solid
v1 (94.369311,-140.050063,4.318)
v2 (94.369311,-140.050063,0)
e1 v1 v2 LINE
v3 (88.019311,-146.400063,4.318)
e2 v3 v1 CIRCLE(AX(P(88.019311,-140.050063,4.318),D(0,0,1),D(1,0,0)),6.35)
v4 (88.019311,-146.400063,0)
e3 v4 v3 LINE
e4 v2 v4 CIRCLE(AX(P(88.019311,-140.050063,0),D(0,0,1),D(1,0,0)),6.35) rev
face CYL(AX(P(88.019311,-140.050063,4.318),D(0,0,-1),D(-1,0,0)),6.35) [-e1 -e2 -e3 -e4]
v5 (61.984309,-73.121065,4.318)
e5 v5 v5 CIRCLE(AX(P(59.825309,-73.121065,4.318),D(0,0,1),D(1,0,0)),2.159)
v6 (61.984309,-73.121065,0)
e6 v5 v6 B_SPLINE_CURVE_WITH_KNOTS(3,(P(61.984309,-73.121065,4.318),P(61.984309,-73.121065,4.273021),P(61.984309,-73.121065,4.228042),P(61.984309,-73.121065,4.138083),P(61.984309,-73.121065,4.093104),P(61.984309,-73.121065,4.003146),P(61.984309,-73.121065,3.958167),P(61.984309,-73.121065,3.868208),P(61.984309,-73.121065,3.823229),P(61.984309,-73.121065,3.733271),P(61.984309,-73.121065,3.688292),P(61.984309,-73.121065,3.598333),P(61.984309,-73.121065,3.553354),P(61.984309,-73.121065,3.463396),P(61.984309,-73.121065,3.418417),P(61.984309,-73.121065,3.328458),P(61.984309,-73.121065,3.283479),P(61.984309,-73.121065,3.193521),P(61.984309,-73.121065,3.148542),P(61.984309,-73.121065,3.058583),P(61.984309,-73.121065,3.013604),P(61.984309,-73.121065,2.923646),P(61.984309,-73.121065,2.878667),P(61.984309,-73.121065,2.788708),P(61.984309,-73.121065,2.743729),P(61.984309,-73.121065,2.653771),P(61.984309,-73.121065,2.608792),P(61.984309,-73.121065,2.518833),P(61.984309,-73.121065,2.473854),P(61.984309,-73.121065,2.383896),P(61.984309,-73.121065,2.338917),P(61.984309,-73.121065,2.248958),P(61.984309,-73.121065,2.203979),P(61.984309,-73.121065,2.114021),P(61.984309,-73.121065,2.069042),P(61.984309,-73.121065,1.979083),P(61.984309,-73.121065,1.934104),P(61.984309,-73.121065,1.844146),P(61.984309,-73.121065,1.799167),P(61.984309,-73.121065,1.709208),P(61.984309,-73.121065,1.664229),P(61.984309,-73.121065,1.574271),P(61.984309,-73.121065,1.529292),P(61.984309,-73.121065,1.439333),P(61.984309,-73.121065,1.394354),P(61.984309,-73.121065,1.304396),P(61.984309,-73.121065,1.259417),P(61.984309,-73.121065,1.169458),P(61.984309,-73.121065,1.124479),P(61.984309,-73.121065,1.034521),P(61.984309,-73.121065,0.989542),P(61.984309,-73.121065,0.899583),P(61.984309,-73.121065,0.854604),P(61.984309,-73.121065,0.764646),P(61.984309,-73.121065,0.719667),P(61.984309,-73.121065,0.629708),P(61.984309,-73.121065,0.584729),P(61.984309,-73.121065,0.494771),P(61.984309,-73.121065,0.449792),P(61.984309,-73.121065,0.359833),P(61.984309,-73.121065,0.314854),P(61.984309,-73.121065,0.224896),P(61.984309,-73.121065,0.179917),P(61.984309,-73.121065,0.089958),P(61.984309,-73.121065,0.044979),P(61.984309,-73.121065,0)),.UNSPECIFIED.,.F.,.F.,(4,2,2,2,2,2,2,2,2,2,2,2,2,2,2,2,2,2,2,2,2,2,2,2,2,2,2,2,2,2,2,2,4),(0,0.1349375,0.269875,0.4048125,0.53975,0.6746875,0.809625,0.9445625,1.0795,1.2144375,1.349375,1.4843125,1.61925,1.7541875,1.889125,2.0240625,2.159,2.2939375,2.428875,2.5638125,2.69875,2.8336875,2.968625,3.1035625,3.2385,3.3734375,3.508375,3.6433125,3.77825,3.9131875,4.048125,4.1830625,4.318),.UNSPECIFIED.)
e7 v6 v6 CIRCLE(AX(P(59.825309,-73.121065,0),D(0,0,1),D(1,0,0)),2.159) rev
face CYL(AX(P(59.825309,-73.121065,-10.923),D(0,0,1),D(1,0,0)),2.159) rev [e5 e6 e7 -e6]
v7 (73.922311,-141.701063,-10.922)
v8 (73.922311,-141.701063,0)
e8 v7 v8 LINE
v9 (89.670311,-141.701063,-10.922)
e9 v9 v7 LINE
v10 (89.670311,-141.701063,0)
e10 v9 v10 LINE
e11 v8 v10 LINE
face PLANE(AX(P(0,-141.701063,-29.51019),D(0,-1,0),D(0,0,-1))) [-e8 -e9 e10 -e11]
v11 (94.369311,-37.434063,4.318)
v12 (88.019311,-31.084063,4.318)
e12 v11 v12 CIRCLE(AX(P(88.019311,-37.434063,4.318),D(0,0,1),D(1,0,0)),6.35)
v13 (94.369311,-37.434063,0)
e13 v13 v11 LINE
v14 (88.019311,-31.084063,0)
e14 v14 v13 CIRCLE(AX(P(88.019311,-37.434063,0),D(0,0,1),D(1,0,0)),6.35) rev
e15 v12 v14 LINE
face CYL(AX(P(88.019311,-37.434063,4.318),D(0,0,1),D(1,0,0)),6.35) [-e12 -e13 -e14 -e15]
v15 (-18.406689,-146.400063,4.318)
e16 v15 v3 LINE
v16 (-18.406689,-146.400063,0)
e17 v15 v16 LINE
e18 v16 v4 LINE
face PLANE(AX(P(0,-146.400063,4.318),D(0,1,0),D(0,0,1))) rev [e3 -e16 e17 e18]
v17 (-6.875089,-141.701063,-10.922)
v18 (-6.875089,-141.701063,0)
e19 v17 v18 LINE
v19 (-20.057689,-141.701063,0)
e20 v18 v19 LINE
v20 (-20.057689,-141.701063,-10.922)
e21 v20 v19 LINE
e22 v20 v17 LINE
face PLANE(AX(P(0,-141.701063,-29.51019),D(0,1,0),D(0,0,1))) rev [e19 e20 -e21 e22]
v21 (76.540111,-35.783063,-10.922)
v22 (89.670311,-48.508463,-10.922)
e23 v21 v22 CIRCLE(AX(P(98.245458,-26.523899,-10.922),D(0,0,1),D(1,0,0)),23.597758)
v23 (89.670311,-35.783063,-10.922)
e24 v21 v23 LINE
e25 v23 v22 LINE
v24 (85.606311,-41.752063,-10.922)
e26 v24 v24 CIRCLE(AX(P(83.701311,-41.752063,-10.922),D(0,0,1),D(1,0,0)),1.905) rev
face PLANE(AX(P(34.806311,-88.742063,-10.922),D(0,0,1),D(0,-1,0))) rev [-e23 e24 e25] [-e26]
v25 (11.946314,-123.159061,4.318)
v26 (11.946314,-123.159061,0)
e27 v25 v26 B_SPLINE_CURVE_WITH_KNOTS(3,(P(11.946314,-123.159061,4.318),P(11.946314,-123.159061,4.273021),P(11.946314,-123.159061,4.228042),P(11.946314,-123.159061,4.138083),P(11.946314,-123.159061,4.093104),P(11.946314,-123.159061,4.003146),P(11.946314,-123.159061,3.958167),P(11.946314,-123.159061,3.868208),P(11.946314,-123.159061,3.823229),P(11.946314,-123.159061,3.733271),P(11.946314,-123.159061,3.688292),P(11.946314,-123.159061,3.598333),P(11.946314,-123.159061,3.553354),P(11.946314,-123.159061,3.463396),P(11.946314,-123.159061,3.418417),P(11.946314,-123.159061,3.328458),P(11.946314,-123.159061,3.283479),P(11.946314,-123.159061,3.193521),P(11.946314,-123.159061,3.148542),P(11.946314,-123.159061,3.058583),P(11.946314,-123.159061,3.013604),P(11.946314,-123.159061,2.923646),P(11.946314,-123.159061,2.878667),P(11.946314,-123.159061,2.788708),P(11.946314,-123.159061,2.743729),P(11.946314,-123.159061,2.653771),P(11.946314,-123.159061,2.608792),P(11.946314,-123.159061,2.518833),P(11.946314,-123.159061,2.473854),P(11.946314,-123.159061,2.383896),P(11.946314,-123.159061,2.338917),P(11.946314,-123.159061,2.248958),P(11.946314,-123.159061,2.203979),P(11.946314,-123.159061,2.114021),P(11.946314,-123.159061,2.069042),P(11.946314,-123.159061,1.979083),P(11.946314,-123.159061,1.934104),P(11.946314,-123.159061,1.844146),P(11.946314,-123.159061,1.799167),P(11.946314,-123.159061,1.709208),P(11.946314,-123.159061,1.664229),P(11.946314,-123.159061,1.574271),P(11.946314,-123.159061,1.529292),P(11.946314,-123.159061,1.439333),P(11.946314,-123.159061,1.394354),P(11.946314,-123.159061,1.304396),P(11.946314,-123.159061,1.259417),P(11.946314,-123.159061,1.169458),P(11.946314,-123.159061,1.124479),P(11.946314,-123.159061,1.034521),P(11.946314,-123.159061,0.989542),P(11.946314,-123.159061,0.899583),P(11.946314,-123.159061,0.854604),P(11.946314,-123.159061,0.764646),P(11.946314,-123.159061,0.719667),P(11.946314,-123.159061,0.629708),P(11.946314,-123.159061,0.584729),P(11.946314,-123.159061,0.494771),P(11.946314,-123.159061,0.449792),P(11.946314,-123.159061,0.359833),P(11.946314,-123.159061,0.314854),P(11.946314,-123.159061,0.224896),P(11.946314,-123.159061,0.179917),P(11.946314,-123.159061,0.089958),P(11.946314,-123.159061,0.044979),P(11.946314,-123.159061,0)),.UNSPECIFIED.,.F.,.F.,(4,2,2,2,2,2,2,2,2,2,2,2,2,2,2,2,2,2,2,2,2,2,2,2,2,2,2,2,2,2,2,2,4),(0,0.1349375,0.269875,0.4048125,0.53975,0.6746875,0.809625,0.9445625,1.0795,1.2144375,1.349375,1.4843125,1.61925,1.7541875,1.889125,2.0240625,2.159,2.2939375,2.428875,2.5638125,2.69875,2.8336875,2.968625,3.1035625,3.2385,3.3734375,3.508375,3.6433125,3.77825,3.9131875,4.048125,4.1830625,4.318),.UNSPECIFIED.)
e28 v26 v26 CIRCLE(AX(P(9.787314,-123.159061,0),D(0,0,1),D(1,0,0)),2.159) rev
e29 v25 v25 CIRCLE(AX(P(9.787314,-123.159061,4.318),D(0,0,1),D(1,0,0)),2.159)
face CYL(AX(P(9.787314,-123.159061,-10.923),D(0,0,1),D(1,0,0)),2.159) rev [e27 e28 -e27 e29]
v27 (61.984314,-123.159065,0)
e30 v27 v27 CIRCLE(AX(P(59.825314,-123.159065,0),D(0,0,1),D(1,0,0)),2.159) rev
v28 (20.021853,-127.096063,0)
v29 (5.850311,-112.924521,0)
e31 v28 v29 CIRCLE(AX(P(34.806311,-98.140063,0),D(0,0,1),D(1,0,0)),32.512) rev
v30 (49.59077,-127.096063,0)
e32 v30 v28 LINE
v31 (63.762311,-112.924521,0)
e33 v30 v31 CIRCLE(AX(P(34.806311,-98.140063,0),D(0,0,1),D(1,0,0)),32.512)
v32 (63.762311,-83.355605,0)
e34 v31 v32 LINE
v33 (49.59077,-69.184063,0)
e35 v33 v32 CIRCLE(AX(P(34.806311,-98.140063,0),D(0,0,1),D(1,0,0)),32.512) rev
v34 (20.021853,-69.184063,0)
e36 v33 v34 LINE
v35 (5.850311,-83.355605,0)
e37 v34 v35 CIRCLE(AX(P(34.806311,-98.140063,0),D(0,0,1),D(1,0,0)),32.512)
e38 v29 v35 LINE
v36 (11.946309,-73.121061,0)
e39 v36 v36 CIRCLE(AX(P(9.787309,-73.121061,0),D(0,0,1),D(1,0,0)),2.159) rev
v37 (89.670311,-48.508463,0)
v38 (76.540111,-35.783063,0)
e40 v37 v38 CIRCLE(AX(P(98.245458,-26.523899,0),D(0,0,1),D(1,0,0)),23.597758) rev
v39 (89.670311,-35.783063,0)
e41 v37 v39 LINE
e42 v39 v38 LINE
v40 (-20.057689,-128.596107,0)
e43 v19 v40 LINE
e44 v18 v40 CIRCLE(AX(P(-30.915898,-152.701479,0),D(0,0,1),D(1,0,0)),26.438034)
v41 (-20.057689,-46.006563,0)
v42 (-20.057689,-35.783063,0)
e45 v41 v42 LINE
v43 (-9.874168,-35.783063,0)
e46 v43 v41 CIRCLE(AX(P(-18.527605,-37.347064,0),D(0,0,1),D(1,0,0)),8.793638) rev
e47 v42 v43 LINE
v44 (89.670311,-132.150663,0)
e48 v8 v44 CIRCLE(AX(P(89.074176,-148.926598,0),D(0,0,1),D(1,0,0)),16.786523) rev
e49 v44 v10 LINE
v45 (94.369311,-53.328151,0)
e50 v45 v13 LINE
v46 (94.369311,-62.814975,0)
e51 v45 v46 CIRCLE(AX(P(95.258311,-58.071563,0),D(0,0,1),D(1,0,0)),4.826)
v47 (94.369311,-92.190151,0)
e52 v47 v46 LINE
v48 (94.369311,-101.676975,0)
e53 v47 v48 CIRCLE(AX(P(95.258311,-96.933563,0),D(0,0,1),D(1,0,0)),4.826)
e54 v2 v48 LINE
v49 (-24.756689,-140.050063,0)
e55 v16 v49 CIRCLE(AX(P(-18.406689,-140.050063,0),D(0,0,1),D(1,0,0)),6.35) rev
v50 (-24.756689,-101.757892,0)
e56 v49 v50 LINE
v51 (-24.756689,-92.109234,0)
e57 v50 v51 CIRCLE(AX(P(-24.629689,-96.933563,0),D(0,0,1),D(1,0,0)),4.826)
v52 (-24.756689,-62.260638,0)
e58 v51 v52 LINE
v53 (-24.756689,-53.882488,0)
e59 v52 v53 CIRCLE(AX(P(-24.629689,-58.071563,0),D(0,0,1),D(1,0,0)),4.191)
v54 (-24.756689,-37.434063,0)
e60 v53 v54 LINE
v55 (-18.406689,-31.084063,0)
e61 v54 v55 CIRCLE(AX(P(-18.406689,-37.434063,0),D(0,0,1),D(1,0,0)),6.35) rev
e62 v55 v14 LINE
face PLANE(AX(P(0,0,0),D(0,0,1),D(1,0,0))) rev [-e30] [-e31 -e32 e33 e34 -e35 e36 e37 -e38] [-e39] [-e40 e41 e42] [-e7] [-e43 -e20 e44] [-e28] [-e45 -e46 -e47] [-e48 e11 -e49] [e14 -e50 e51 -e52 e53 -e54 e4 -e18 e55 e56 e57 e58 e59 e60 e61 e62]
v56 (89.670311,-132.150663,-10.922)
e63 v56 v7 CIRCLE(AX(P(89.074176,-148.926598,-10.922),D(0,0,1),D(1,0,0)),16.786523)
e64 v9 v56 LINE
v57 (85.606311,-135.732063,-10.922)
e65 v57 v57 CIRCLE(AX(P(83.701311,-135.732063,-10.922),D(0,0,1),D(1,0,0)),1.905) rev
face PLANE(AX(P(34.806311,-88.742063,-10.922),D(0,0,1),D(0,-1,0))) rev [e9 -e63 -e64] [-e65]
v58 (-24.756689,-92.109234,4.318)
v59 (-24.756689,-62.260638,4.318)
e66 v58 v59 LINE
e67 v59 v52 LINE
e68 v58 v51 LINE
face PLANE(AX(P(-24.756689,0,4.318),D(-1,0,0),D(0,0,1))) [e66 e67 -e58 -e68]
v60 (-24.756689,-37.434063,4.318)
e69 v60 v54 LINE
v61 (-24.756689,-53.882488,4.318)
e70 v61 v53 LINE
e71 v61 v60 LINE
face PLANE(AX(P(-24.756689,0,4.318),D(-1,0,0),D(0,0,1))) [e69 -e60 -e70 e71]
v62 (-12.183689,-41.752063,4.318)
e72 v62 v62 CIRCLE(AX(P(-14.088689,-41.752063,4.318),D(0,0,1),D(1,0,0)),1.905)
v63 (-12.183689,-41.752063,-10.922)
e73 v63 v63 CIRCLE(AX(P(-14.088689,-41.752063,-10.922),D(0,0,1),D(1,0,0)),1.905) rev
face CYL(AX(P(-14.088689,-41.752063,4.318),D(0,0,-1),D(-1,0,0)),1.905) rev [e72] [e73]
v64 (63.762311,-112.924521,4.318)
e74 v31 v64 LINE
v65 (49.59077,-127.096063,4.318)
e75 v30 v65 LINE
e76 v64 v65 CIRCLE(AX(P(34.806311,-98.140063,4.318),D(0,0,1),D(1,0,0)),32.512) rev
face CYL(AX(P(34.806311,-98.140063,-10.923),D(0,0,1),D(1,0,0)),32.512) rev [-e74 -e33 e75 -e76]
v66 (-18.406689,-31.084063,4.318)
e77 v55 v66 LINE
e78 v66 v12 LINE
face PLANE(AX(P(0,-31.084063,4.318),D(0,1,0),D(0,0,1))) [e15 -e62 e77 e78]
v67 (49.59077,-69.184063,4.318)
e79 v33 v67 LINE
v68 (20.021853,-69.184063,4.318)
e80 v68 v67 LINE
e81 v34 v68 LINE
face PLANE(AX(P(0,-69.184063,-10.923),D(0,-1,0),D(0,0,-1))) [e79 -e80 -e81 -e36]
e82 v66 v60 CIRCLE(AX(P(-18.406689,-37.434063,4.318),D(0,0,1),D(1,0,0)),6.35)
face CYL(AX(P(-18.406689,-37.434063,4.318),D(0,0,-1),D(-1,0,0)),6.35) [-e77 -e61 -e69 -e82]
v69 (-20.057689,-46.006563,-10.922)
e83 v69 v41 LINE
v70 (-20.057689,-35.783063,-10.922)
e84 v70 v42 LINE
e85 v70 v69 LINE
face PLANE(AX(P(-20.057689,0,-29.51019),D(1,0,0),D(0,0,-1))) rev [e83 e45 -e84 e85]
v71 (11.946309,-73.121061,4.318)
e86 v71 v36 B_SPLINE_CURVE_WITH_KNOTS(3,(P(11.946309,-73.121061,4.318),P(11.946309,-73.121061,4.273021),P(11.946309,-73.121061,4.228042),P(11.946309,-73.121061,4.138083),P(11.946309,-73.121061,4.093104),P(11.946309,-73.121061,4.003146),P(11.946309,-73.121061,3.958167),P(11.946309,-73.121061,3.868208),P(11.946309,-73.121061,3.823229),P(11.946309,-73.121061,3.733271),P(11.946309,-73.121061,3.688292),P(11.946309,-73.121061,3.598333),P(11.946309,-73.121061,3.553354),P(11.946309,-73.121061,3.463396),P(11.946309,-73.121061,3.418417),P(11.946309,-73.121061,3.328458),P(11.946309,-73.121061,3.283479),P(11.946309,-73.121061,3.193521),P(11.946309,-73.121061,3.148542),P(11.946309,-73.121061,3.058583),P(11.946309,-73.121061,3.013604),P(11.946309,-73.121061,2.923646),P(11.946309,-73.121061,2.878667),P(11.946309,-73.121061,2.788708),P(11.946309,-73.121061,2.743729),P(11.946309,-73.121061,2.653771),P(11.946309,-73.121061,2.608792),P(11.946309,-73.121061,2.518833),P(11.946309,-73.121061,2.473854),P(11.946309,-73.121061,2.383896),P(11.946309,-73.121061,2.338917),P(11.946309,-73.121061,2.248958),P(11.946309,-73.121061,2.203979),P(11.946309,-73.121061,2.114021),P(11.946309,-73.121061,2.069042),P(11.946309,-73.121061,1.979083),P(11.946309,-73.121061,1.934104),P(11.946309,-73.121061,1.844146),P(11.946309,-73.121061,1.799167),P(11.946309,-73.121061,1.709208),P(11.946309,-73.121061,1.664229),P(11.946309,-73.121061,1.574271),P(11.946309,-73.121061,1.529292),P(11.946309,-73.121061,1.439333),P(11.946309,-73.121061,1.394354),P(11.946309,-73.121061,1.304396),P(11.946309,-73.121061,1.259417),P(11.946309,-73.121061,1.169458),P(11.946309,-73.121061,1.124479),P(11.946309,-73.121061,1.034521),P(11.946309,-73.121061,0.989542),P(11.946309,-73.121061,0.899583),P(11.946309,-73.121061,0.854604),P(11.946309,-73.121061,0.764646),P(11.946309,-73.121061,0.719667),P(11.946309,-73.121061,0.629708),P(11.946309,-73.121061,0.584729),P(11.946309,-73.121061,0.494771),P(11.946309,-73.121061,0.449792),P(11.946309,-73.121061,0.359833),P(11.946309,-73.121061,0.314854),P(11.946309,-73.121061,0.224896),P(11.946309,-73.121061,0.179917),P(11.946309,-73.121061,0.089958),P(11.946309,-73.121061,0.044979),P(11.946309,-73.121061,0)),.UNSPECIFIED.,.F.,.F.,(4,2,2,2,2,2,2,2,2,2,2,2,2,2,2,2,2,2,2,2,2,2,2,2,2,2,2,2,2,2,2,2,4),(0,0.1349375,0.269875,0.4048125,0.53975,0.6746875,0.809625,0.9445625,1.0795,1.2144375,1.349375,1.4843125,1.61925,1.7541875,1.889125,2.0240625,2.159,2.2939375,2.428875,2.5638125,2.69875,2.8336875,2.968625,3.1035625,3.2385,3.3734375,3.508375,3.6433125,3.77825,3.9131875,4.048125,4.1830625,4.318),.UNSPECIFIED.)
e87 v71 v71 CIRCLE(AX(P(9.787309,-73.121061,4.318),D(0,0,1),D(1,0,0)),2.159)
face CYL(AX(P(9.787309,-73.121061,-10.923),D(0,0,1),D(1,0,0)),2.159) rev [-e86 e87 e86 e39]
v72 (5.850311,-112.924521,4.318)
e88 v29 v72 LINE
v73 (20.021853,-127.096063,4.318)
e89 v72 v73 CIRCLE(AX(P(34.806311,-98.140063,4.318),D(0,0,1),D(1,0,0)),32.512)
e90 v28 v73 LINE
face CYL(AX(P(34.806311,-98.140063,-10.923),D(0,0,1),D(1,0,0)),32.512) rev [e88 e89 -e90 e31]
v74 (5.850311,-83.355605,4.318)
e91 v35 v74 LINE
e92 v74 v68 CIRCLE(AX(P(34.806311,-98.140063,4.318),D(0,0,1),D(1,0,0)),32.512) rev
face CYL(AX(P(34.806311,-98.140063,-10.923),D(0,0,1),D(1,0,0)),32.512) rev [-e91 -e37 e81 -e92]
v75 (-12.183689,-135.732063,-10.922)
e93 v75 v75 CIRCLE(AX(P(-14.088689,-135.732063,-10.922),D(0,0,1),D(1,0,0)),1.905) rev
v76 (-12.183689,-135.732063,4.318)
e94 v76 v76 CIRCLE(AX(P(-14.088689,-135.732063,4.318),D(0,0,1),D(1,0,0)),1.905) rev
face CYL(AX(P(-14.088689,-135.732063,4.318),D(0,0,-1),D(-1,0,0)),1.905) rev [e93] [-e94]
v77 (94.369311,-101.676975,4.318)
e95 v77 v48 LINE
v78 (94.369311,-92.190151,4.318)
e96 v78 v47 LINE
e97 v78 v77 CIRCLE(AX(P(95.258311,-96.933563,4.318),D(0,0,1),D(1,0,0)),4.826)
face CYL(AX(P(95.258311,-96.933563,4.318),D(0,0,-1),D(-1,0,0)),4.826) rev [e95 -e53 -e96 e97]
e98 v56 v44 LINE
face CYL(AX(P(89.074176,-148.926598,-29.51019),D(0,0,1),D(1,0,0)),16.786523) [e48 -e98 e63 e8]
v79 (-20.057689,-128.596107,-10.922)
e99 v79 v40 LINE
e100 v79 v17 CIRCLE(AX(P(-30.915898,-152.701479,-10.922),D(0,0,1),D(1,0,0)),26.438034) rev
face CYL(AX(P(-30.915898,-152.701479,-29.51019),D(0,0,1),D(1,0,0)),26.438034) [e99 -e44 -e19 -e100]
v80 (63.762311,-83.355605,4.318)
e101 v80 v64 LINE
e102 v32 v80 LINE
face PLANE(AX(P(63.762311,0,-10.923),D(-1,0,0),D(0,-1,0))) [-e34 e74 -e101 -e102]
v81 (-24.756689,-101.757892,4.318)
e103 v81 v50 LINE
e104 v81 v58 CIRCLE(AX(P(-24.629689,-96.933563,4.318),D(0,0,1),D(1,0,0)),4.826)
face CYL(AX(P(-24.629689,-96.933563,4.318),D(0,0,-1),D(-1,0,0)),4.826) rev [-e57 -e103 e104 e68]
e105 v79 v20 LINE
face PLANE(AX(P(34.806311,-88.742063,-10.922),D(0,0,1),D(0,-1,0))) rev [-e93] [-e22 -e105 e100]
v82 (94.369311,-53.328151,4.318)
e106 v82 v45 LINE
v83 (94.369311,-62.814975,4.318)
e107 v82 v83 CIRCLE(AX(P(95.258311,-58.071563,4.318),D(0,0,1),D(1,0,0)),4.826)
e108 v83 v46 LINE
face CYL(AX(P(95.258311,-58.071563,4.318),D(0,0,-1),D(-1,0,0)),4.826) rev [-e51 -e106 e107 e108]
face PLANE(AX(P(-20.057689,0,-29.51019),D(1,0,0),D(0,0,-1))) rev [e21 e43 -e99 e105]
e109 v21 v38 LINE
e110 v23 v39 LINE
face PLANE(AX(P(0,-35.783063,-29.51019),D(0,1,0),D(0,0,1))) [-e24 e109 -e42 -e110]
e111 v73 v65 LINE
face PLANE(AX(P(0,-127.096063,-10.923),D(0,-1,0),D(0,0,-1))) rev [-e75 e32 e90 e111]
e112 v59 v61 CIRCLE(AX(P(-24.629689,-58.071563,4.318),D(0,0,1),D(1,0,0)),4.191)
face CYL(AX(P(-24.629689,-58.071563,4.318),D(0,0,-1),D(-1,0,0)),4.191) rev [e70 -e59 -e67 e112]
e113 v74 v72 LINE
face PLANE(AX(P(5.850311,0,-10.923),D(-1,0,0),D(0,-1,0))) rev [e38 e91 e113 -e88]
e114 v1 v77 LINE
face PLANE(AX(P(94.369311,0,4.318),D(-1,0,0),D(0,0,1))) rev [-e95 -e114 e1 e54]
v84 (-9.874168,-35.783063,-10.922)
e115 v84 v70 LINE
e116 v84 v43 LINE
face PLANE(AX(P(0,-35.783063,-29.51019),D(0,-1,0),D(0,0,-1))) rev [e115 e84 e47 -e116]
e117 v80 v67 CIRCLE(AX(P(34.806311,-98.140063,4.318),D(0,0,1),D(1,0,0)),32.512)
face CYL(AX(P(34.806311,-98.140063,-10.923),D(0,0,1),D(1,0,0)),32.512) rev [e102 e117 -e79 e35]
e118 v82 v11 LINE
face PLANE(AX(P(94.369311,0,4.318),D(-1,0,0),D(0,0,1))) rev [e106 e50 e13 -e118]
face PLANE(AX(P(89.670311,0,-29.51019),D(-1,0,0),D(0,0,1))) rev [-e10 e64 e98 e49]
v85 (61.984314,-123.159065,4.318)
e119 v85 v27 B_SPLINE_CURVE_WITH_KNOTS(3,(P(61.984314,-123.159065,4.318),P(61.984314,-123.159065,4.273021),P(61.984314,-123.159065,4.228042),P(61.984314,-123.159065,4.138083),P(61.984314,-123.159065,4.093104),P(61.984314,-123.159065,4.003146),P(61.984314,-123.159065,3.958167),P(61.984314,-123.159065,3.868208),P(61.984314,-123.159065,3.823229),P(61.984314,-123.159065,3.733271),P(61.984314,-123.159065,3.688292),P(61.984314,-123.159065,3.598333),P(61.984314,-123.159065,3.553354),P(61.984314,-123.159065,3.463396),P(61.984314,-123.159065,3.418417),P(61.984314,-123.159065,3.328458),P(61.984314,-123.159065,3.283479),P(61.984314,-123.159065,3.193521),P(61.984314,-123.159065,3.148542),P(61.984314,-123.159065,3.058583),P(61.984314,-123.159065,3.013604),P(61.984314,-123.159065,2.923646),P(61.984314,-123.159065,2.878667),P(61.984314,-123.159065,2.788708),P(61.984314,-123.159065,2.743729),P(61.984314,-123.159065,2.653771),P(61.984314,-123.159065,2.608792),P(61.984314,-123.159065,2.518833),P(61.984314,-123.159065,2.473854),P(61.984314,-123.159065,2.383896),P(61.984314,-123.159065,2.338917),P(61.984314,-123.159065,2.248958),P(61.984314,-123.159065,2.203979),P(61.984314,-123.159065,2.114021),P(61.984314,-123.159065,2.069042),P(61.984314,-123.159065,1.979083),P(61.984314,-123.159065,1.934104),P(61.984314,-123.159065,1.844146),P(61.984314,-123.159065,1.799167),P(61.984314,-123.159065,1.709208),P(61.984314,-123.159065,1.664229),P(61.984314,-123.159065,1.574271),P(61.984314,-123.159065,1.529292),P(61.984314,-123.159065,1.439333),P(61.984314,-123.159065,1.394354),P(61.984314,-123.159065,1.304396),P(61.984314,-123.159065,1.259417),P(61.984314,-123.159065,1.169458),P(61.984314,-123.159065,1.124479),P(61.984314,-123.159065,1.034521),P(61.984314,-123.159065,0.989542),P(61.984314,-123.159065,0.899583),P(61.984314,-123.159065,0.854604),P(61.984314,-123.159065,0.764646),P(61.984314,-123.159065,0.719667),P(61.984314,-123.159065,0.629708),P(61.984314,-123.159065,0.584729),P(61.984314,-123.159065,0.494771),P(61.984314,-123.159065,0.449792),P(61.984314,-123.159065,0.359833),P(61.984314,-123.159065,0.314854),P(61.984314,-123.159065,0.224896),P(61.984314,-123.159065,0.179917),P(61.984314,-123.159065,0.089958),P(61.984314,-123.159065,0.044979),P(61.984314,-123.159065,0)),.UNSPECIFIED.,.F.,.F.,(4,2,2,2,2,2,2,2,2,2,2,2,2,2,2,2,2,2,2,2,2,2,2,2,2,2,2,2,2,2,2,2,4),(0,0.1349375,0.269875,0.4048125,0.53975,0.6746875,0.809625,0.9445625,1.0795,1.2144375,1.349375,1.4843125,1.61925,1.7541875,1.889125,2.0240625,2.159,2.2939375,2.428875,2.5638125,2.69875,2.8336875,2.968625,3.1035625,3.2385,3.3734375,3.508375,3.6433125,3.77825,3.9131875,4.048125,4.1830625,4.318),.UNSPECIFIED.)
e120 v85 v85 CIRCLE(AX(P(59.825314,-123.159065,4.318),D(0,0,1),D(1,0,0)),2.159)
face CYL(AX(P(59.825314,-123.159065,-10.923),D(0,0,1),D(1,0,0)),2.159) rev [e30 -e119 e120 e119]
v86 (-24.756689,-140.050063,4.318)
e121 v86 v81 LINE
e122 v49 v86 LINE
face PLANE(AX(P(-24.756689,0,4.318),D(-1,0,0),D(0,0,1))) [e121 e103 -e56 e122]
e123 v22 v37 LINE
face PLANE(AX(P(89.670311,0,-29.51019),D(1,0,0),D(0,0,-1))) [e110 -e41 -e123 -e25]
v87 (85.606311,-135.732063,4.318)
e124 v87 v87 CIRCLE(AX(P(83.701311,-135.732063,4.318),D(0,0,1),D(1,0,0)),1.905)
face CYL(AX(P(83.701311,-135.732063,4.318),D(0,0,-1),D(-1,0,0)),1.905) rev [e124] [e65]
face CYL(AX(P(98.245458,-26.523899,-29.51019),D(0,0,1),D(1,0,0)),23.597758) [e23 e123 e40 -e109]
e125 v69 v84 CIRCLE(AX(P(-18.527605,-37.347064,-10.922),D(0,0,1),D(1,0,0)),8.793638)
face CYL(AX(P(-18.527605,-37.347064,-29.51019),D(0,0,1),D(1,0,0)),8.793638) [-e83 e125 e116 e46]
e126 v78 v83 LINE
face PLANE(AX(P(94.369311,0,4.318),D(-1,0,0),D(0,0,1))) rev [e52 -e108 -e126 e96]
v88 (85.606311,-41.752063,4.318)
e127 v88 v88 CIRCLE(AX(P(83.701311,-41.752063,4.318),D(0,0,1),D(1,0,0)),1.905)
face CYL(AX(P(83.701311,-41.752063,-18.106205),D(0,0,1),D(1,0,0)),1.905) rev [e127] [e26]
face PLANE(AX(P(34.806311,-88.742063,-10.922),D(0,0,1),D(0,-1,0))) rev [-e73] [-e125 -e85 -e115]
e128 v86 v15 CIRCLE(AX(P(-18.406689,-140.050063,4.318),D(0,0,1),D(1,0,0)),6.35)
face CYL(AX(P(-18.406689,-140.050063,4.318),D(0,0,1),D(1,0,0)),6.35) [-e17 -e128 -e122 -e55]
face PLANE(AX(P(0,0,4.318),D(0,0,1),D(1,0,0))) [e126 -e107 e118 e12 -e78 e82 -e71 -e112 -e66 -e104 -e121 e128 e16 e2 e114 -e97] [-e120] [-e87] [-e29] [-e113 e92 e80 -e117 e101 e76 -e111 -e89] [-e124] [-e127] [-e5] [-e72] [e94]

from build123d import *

# Parameters (mm, degrees)
SKETCH1_R                 = 2.54
SKETCH1_R_2               = 1.905
BOSS_EXTRUDE1_DEPTH       = 10.922
BOSS_EXTRUDE1_2_DEPTH     = 10.922
BOSS_EXTRUDE1_3_DEPTH     = 10.922
BOSS_EXTRUDE1_4_DEPTH     = 10.922
BOSS_EXTRUDE3_START       = -10.922
BOSS_EXTRUDE3_OUTLINE_R   = 1.905
BOSS_EXTRUDE3_DEPTH       = 10.922
BOSS_EXTRUDE3_2_OUTLINE_R = 1.905
BOSS_EXTRUDE3_2_DEPTH     = 10.922
BOSS_EXTRUDE3_3_OUTLINE_R = 1.905
BOSS_EXTRUDE3_3_DEPTH     = 10.922
BOSS_EXTRUDE3_4_OUTLINE_R = 1.905
BOSS_EXTRUDE3_4_DEPTH     = 10.922
BOSS_EXTRUDE4_START       = 4.318
SKETCH3_R                 = 1.905
BOSS_EXTRUDE4_DEPTH       = 4.318
FILLET1_R                 = 6.35
CUT_EXTRUDE1_REACH        = 176.845
SKETCH5_R                 = 2.159


with BuildPart() as part:
    # Sketch1 → Boss-Extrude1 (new body)
    with BuildSketch(Plane.XY):
        with Locations((83.701311305, -41.752062977)):
            Circle(SKETCH1_R)
        with Locations((83.701311305, -41.752062977)):
            Circle(SKETCH1_R_2, mode=Mode.SUBTRACT)
    extrude(amount=-BOSS_EXTRUDE1_DEPTH)

    # Boss-Extrude3: read off the stored shape, not the designer's step
    # Boss-Extrude3 outline → Boss-Extrude3 (add)
    with BuildSketch(Plane.XY.offset(BOSS_EXTRUDE3_START)):
        with BuildLine():
            Line((89.670311305, -35.783062977), (76.540111305, -35.783062977))
            ThreePointArc((76.540111305, -35.783062977), (81.82257698, -43.469198406), (89.670311305, -48.508462977))
            Line((89.670311305, -48.508462977), (89.670311305, -35.783062977))
        make_face()
        with Locations((83.701311305, -41.752062977)):
            Circle(BOSS_EXTRUDE3_OUTLINE_R, mode=Mode.SUBTRACT)
    extrude(amount=BOSS_EXTRUDE3_DEPTH)



with BuildPart() as body_2:
    # Sketch1 → Boss-Extrude1 2 (new body)
    with BuildSketch(Plane.XY):
        with Locations((-14.088688695, -41.752062977)):
            Circle(SKETCH1_R)
        with Locations((-14.088688695, -41.752062977)):
            Circle(SKETCH1_R_2, mode=Mode.SUBTRACT)
    extrude(amount=-BOSS_EXTRUDE1_2_DEPTH)

    # Boss-Extrude3 4 outline → Boss-Extrude3 4 (add)
    with BuildSketch(Plane.XY.offset(BOSS_EXTRUDE3_START)):
        with BuildLine():
            Line((-20.057688695, -35.783062977), (-20.057688695, -46.006562977))
            ThreePointArc((-20.057688695, -46.006562977), (-12.297393991, -43.552911895), (-9.874167768, -35.783062977))
            Line((-9.874167768, -35.783062977), (-20.057688695, -35.783062977))
        make_face()
        with Locations((-14.088688695, -41.752062977)):
            Circle(BOSS_EXTRUDE3_4_OUTLINE_R, mode=Mode.SUBTRACT)
    extrude(amount=BOSS_EXTRUDE3_4_DEPTH)


with BuildPart() as body_3:
    # Sketch1 → Boss-Extrude1 3 (new body)
    with BuildSketch(Plane.XY):
        with Locations((-14.088688695, -135.732062977)):
            Circle(SKETCH1_R)
        with Locations((-14.088688695, -135.732062977)):
            Circle(SKETCH1_R_2, mode=Mode.SUBTRACT)
    extrude(amount=-BOSS_EXTRUDE1_3_DEPTH)

    # Boss-Extrude3 3 outline → Boss-Extrude3 3 (add)
    with BuildSketch(Plane.XY.offset(BOSS_EXTRUDE3_START)):
        with BuildLine():
            Line((-20.057688695, -141.701062977), (-6.875088695, -141.701062977))
            ThreePointArc((-6.875088695, -141.701062977), (-12.276682873, -133.951830584), (-20.057688695, -128.59610741))
            Line((-20.057688695, -128.59610741), (-20.057688695, -141.701062977))
        make_face()
        with Locations((-14.088688695, -135.732062977)):
            Circle(BOSS_EXTRUDE3_3_OUTLINE_R, mode=Mode.SUBTRACT)
    extrude(amount=BOSS_EXTRUDE3_3_DEPTH)


with BuildPart() as body_4:
    # Sketch1 → Boss-Extrude1 4 (new body)
    with BuildSketch(Plane.XY):
        with Locations((83.701311305, -135.732062977)):
            Circle(SKETCH1_R)
        with Locations((83.701311305, -135.732062977)):
            Circle(SKETCH1_R_2, mode=Mode.SUBTRACT)
    extrude(amount=-BOSS_EXTRUDE1_4_DEPTH)

    # Boss-Extrude3 2 outline → Boss-Extrude3 2 (add)
    with BuildSketch(Plane.XY.offset(BOSS_EXTRUDE3_START)):
        with BuildLine():
            Line((89.670311305, -141.701062977), (89.670311305, -132.150662977))
            ThreePointArc((89.670311305, -132.150662977), (80.369588205, -134.573287653), (73.922311305, -141.701062977))
            Line((73.922311305, -141.701062977), (89.670311305, -141.701062977))
        make_face()
        with Locations((83.701311305, -135.732062977)):
            Circle(BOSS_EXTRUDE3_2_OUTLINE_R, mode=Mode.SUBTRACT)
    extrude(amount=BOSS_EXTRUDE3_2_DEPTH)


with BuildPart() as part_1:
    add(part.part)

    add(body_2.part)  # Boss-Extrude4 merges body 2

    add(body_3.part)  # Boss-Extrude4 merges body 3

    add(body_4.part)  # Boss-Extrude4 merges body 4
    # Sketch3 → Boss-Extrude4 (add)
    with BuildSketch(Plane.XY.offset(BOSS_EXTRUDE4_START)):
        with BuildLine():
            Line((-24.756688695, -101.757891635), (-24.756688695, -146.400062977))
            Line((-24.756688695, -146.400062977), (94.369311305, -146.400062977))
            Line((94.369311305, -146.400062977), (94.369311305, -101.676974724))
            ThreePointArc((94.369311305, -101.676974724), (90.432311305, -96.933562977), (94.369311305, -92.19015123))
            Line((94.369311305, -92.19015123), (94.369311305, -62.814974724))
            ThreePointArc((94.369311305, -62.814974724), (90.432311305, -58.071562977), (94.369311305, -53.32815123))
            Line((94.369311305, -53.32815123), (94.369311305, -31.084062977))
            Line((94.369311305, -31.084062977), (-24.756688695, -31.084062977))
            Line((-24.756688695, -31.084062977), (-24.756688695, -53.882487661))
            ThreePointArc((-24.756688695, -53.882487661), (-20.438688695, -58.071562977), (-24.756688695, -62.260638293))
            Line((-24.756688695, -62.260638293), (-24.756688695, -92.109234319))
            ThreePointArc((-24.756688695, -92.109234319), (-19.803688695, -96.933562977), (-24.756688695, -101.757891635))
        make_face()
        with Locations((83.701311305, -41.752062977)):
            Circle(SKETCH3_R, mode=Mode.SUBTRACT)
        with Locations((-14.088688695, -135.732062977)):
            Circle(SKETCH3_R, mode=Mode.SUBTRACT)
        with Locations((83.701311305, -135.732062977)):
            Circle(SKETCH3_R, mode=Mode.SUBTRACT)
        with Locations((-14.088688695, -41.752062977)):
            Circle(SKETCH3_R, mode=Mode.SUBTRACT)
    extrude(amount=-BOSS_EXTRUDE4_DEPTH)

    # Fillet1
    fillet1_edges = [part_1.edges().sort_by_distance(p)[0] for p in [
        (-24.756688695, -146.400062977, 2.159),
        (94.369311305, -146.400062977, 2.159),
        (94.369311305, -31.084062977, 2.159),
        (-24.756688695, -31.084062977, 2.159),
    ]]
    fillet(fillet1_edges, radius=FILLET1_R)

    # Sketch5 → Cut-Extrude1 (cut, up to next)
    with BuildSketch(Plane.XY.offset(4.318), mode=Mode.PRIVATE) as cut_extrude1_sk1:
        with BuildLine():
            Line((5.850311305, -98.140062977), (34.806311305, -98.140062977))
            Line((34.806311305, -98.140062977), (34.806311305, -69.184062977))
            Line((34.806311305, -69.184062977), (20.021852978, -69.184062977))
            ThreePointArc((20.021852978, -69.184062977), (11.816855635, -75.150607307), (5.850311305, -83.355604651))
            Line((5.850311305, -83.355604651), (5.850311305, -98.140062977))
        make_face()
    cut_extrude1_tool1 = extrude(cut_extrude1_sk1.sketch, amount=-CUT_EXTRUDE1_REACH, mode=Mode.PRIVATE) & part_1.part
    # Sketch5 → Cut-Extrude1 (cut, up to next)
    with BuildSketch(Plane.XY.offset(4.318), mode=Mode.PRIVATE) as cut_extrude1_sk2:
        with BuildLine():
            Line((34.806311305, -69.184062977), (34.806311305, -98.140062977))
            Line((34.806311305, -98.140062977), (63.762311305, -98.140062977))
            Line((63.762311305, -98.140062977), (63.762311305, -83.355604651))
            ThreePointArc((63.762311305, -83.355604651), (57.795766975, -75.150607307), (49.590769631, -69.184062977))
            Line((49.590769631, -69.184062977), (34.806311305, -69.184062977))
        make_face()
    cut_extrude1_tool2 = extrude(cut_extrude1_sk2.sketch, amount=-CUT_EXTRUDE1_REACH, mode=Mode.PRIVATE) & part_1.part
    # Sketch5 → Cut-Extrude1 (cut, up to next)
    with BuildSketch(Plane.XY.offset(4.318), mode=Mode.PRIVATE) as cut_extrude1_sk3:
        with Locations((9.787309036, -73.121060708)):
            Circle(SKETCH5_R)
    cut_extrude1_tool3 = extrude(cut_extrude1_sk3.sketch, amount=-CUT_EXTRUDE1_REACH, mode=Mode.PRIVATE) & part_1.part
    # Sketch5 → Cut-Extrude1 (cut, up to next)
    with BuildSketch(Plane.XY.offset(4.318), mode=Mode.PRIVATE) as cut_extrude1_sk4:
        with Locations((59.825309036, -73.121065246)):
            Circle(SKETCH5_R)
    cut_extrude1_tool4 = extrude(cut_extrude1_sk4.sketch, amount=-CUT_EXTRUDE1_REACH, mode=Mode.PRIVATE) & part_1.part
    # Sketch5 → Cut-Extrude1 (cut, up to next)
    with BuildSketch(Plane.XY.offset(4.318), mode=Mode.PRIVATE) as cut_extrude1_sk5:
        with Locations((59.825313573, -123.159065246)):
            Circle(SKETCH5_R)
    cut_extrude1_tool5 = extrude(cut_extrude1_sk5.sketch, amount=-CUT_EXTRUDE1_REACH, mode=Mode.PRIVATE) & part_1.part
    # Sketch5 → Cut-Extrude1 (cut, up to next)
    with BuildSketch(Plane.XY.offset(4.318), mode=Mode.PRIVATE) as cut_extrude1_sk6:
        with BuildLine():
            Line((34.806311305, -98.140062977), (34.806311305, -127.096062977))
            Line((34.806311305, -127.096062977), (49.590769631, -127.096062977))
            ThreePointArc((49.590769631, -127.096062977), (57.795766975, -121.129518647), (63.762311305, -112.924521303))
            Line((63.762311305, -112.924521303), (63.762311305, -98.140062977))
            Line((63.762311305, -98.140062977), (34.806311305, -98.140062977))
        make_face()
    cut_extrude1_tool6 = extrude(cut_extrude1_sk6.sketch, amount=-CUT_EXTRUDE1_REACH, mode=Mode.PRIVATE) & part_1.part
    # Sketch5 → Cut-Extrude1 (cut, up to next)
    with BuildSketch(Plane.XY.offset(4.318), mode=Mode.PRIVATE) as cut_extrude1_sk7:
        with BuildLine():
            Line((20.021852978, -127.096062977), (34.806311305, -127.096062977))
            Line((34.806311305, -127.096062977), (34.806311305, -98.140062977))
            Line((34.806311305, -98.140062977), (5.850311305, -98.140062977))
            Line((5.850311305, -98.140062977), (5.850311305, -112.924521303))
            ThreePointArc((5.850311305, -112.924521303), (11.816855635, -121.129518647), (20.021852978, -127.096062977))
        make_face()
    cut_extrude1_tool7 = extrude(cut_extrude1_sk7.sketch, amount=-CUT_EXTRUDE1_REACH, mode=Mode.PRIVATE) & part_1.part
    # Sketch5 → Cut-Extrude1 (cut, up to next)
    with BuildSketch(Plane.XY.offset(4.318), mode=Mode.PRIVATE) as cut_extrude1_sk8:
        with Locations((9.787313573, -123.159060708)):
            Circle(SKETCH5_R)
    cut_extrude1_tool8 = extrude(cut_extrude1_sk8.sketch, amount=-CUT_EXTRUDE1_REACH, mode=Mode.PRIVATE) & part_1.part
    add(cut_extrude1_tool1.solids().sort_by_distance((21.39883, -84.732582, 4.318))[0], mode=Mode.SUBTRACT)
    add(cut_extrude1_tool2.solids().sort_by_distance((48.213793, -84.732582, 4.318))[0], mode=Mode.SUBTRACT)
    add(cut_extrude1_tool3.solids().sort_by_distance((9.787309, -73.121061, 4.318))[0], mode=Mode.SUBTRACT)
    add(cut_extrude1_tool4.solids().sort_by_distance((59.825309, -73.121065, 4.318))[0], mode=Mode.SUBTRACT)
    add(cut_extrude1_tool5.solids().sort_by_distance((59.825314, -123.159065, 4.318))[0], mode=Mode.SUBTRACT)
    add(cut_extrude1_tool6.solids().sort_by_distance((48.213793, -111.547544, 4.318))[0], mode=Mode.SUBTRACT)
    add(cut_extrude1_tool7.solids().sort_by_distance((21.39883, -111.547544, 4.318))[0], mode=Mode.SUBTRACT)
    add(cut_extrude1_tool8.solids().sort_by_distance((9.787314, -123.159061, 4.318))[0], mode=Mode.SUBTRACT)


solid = part_1.part
